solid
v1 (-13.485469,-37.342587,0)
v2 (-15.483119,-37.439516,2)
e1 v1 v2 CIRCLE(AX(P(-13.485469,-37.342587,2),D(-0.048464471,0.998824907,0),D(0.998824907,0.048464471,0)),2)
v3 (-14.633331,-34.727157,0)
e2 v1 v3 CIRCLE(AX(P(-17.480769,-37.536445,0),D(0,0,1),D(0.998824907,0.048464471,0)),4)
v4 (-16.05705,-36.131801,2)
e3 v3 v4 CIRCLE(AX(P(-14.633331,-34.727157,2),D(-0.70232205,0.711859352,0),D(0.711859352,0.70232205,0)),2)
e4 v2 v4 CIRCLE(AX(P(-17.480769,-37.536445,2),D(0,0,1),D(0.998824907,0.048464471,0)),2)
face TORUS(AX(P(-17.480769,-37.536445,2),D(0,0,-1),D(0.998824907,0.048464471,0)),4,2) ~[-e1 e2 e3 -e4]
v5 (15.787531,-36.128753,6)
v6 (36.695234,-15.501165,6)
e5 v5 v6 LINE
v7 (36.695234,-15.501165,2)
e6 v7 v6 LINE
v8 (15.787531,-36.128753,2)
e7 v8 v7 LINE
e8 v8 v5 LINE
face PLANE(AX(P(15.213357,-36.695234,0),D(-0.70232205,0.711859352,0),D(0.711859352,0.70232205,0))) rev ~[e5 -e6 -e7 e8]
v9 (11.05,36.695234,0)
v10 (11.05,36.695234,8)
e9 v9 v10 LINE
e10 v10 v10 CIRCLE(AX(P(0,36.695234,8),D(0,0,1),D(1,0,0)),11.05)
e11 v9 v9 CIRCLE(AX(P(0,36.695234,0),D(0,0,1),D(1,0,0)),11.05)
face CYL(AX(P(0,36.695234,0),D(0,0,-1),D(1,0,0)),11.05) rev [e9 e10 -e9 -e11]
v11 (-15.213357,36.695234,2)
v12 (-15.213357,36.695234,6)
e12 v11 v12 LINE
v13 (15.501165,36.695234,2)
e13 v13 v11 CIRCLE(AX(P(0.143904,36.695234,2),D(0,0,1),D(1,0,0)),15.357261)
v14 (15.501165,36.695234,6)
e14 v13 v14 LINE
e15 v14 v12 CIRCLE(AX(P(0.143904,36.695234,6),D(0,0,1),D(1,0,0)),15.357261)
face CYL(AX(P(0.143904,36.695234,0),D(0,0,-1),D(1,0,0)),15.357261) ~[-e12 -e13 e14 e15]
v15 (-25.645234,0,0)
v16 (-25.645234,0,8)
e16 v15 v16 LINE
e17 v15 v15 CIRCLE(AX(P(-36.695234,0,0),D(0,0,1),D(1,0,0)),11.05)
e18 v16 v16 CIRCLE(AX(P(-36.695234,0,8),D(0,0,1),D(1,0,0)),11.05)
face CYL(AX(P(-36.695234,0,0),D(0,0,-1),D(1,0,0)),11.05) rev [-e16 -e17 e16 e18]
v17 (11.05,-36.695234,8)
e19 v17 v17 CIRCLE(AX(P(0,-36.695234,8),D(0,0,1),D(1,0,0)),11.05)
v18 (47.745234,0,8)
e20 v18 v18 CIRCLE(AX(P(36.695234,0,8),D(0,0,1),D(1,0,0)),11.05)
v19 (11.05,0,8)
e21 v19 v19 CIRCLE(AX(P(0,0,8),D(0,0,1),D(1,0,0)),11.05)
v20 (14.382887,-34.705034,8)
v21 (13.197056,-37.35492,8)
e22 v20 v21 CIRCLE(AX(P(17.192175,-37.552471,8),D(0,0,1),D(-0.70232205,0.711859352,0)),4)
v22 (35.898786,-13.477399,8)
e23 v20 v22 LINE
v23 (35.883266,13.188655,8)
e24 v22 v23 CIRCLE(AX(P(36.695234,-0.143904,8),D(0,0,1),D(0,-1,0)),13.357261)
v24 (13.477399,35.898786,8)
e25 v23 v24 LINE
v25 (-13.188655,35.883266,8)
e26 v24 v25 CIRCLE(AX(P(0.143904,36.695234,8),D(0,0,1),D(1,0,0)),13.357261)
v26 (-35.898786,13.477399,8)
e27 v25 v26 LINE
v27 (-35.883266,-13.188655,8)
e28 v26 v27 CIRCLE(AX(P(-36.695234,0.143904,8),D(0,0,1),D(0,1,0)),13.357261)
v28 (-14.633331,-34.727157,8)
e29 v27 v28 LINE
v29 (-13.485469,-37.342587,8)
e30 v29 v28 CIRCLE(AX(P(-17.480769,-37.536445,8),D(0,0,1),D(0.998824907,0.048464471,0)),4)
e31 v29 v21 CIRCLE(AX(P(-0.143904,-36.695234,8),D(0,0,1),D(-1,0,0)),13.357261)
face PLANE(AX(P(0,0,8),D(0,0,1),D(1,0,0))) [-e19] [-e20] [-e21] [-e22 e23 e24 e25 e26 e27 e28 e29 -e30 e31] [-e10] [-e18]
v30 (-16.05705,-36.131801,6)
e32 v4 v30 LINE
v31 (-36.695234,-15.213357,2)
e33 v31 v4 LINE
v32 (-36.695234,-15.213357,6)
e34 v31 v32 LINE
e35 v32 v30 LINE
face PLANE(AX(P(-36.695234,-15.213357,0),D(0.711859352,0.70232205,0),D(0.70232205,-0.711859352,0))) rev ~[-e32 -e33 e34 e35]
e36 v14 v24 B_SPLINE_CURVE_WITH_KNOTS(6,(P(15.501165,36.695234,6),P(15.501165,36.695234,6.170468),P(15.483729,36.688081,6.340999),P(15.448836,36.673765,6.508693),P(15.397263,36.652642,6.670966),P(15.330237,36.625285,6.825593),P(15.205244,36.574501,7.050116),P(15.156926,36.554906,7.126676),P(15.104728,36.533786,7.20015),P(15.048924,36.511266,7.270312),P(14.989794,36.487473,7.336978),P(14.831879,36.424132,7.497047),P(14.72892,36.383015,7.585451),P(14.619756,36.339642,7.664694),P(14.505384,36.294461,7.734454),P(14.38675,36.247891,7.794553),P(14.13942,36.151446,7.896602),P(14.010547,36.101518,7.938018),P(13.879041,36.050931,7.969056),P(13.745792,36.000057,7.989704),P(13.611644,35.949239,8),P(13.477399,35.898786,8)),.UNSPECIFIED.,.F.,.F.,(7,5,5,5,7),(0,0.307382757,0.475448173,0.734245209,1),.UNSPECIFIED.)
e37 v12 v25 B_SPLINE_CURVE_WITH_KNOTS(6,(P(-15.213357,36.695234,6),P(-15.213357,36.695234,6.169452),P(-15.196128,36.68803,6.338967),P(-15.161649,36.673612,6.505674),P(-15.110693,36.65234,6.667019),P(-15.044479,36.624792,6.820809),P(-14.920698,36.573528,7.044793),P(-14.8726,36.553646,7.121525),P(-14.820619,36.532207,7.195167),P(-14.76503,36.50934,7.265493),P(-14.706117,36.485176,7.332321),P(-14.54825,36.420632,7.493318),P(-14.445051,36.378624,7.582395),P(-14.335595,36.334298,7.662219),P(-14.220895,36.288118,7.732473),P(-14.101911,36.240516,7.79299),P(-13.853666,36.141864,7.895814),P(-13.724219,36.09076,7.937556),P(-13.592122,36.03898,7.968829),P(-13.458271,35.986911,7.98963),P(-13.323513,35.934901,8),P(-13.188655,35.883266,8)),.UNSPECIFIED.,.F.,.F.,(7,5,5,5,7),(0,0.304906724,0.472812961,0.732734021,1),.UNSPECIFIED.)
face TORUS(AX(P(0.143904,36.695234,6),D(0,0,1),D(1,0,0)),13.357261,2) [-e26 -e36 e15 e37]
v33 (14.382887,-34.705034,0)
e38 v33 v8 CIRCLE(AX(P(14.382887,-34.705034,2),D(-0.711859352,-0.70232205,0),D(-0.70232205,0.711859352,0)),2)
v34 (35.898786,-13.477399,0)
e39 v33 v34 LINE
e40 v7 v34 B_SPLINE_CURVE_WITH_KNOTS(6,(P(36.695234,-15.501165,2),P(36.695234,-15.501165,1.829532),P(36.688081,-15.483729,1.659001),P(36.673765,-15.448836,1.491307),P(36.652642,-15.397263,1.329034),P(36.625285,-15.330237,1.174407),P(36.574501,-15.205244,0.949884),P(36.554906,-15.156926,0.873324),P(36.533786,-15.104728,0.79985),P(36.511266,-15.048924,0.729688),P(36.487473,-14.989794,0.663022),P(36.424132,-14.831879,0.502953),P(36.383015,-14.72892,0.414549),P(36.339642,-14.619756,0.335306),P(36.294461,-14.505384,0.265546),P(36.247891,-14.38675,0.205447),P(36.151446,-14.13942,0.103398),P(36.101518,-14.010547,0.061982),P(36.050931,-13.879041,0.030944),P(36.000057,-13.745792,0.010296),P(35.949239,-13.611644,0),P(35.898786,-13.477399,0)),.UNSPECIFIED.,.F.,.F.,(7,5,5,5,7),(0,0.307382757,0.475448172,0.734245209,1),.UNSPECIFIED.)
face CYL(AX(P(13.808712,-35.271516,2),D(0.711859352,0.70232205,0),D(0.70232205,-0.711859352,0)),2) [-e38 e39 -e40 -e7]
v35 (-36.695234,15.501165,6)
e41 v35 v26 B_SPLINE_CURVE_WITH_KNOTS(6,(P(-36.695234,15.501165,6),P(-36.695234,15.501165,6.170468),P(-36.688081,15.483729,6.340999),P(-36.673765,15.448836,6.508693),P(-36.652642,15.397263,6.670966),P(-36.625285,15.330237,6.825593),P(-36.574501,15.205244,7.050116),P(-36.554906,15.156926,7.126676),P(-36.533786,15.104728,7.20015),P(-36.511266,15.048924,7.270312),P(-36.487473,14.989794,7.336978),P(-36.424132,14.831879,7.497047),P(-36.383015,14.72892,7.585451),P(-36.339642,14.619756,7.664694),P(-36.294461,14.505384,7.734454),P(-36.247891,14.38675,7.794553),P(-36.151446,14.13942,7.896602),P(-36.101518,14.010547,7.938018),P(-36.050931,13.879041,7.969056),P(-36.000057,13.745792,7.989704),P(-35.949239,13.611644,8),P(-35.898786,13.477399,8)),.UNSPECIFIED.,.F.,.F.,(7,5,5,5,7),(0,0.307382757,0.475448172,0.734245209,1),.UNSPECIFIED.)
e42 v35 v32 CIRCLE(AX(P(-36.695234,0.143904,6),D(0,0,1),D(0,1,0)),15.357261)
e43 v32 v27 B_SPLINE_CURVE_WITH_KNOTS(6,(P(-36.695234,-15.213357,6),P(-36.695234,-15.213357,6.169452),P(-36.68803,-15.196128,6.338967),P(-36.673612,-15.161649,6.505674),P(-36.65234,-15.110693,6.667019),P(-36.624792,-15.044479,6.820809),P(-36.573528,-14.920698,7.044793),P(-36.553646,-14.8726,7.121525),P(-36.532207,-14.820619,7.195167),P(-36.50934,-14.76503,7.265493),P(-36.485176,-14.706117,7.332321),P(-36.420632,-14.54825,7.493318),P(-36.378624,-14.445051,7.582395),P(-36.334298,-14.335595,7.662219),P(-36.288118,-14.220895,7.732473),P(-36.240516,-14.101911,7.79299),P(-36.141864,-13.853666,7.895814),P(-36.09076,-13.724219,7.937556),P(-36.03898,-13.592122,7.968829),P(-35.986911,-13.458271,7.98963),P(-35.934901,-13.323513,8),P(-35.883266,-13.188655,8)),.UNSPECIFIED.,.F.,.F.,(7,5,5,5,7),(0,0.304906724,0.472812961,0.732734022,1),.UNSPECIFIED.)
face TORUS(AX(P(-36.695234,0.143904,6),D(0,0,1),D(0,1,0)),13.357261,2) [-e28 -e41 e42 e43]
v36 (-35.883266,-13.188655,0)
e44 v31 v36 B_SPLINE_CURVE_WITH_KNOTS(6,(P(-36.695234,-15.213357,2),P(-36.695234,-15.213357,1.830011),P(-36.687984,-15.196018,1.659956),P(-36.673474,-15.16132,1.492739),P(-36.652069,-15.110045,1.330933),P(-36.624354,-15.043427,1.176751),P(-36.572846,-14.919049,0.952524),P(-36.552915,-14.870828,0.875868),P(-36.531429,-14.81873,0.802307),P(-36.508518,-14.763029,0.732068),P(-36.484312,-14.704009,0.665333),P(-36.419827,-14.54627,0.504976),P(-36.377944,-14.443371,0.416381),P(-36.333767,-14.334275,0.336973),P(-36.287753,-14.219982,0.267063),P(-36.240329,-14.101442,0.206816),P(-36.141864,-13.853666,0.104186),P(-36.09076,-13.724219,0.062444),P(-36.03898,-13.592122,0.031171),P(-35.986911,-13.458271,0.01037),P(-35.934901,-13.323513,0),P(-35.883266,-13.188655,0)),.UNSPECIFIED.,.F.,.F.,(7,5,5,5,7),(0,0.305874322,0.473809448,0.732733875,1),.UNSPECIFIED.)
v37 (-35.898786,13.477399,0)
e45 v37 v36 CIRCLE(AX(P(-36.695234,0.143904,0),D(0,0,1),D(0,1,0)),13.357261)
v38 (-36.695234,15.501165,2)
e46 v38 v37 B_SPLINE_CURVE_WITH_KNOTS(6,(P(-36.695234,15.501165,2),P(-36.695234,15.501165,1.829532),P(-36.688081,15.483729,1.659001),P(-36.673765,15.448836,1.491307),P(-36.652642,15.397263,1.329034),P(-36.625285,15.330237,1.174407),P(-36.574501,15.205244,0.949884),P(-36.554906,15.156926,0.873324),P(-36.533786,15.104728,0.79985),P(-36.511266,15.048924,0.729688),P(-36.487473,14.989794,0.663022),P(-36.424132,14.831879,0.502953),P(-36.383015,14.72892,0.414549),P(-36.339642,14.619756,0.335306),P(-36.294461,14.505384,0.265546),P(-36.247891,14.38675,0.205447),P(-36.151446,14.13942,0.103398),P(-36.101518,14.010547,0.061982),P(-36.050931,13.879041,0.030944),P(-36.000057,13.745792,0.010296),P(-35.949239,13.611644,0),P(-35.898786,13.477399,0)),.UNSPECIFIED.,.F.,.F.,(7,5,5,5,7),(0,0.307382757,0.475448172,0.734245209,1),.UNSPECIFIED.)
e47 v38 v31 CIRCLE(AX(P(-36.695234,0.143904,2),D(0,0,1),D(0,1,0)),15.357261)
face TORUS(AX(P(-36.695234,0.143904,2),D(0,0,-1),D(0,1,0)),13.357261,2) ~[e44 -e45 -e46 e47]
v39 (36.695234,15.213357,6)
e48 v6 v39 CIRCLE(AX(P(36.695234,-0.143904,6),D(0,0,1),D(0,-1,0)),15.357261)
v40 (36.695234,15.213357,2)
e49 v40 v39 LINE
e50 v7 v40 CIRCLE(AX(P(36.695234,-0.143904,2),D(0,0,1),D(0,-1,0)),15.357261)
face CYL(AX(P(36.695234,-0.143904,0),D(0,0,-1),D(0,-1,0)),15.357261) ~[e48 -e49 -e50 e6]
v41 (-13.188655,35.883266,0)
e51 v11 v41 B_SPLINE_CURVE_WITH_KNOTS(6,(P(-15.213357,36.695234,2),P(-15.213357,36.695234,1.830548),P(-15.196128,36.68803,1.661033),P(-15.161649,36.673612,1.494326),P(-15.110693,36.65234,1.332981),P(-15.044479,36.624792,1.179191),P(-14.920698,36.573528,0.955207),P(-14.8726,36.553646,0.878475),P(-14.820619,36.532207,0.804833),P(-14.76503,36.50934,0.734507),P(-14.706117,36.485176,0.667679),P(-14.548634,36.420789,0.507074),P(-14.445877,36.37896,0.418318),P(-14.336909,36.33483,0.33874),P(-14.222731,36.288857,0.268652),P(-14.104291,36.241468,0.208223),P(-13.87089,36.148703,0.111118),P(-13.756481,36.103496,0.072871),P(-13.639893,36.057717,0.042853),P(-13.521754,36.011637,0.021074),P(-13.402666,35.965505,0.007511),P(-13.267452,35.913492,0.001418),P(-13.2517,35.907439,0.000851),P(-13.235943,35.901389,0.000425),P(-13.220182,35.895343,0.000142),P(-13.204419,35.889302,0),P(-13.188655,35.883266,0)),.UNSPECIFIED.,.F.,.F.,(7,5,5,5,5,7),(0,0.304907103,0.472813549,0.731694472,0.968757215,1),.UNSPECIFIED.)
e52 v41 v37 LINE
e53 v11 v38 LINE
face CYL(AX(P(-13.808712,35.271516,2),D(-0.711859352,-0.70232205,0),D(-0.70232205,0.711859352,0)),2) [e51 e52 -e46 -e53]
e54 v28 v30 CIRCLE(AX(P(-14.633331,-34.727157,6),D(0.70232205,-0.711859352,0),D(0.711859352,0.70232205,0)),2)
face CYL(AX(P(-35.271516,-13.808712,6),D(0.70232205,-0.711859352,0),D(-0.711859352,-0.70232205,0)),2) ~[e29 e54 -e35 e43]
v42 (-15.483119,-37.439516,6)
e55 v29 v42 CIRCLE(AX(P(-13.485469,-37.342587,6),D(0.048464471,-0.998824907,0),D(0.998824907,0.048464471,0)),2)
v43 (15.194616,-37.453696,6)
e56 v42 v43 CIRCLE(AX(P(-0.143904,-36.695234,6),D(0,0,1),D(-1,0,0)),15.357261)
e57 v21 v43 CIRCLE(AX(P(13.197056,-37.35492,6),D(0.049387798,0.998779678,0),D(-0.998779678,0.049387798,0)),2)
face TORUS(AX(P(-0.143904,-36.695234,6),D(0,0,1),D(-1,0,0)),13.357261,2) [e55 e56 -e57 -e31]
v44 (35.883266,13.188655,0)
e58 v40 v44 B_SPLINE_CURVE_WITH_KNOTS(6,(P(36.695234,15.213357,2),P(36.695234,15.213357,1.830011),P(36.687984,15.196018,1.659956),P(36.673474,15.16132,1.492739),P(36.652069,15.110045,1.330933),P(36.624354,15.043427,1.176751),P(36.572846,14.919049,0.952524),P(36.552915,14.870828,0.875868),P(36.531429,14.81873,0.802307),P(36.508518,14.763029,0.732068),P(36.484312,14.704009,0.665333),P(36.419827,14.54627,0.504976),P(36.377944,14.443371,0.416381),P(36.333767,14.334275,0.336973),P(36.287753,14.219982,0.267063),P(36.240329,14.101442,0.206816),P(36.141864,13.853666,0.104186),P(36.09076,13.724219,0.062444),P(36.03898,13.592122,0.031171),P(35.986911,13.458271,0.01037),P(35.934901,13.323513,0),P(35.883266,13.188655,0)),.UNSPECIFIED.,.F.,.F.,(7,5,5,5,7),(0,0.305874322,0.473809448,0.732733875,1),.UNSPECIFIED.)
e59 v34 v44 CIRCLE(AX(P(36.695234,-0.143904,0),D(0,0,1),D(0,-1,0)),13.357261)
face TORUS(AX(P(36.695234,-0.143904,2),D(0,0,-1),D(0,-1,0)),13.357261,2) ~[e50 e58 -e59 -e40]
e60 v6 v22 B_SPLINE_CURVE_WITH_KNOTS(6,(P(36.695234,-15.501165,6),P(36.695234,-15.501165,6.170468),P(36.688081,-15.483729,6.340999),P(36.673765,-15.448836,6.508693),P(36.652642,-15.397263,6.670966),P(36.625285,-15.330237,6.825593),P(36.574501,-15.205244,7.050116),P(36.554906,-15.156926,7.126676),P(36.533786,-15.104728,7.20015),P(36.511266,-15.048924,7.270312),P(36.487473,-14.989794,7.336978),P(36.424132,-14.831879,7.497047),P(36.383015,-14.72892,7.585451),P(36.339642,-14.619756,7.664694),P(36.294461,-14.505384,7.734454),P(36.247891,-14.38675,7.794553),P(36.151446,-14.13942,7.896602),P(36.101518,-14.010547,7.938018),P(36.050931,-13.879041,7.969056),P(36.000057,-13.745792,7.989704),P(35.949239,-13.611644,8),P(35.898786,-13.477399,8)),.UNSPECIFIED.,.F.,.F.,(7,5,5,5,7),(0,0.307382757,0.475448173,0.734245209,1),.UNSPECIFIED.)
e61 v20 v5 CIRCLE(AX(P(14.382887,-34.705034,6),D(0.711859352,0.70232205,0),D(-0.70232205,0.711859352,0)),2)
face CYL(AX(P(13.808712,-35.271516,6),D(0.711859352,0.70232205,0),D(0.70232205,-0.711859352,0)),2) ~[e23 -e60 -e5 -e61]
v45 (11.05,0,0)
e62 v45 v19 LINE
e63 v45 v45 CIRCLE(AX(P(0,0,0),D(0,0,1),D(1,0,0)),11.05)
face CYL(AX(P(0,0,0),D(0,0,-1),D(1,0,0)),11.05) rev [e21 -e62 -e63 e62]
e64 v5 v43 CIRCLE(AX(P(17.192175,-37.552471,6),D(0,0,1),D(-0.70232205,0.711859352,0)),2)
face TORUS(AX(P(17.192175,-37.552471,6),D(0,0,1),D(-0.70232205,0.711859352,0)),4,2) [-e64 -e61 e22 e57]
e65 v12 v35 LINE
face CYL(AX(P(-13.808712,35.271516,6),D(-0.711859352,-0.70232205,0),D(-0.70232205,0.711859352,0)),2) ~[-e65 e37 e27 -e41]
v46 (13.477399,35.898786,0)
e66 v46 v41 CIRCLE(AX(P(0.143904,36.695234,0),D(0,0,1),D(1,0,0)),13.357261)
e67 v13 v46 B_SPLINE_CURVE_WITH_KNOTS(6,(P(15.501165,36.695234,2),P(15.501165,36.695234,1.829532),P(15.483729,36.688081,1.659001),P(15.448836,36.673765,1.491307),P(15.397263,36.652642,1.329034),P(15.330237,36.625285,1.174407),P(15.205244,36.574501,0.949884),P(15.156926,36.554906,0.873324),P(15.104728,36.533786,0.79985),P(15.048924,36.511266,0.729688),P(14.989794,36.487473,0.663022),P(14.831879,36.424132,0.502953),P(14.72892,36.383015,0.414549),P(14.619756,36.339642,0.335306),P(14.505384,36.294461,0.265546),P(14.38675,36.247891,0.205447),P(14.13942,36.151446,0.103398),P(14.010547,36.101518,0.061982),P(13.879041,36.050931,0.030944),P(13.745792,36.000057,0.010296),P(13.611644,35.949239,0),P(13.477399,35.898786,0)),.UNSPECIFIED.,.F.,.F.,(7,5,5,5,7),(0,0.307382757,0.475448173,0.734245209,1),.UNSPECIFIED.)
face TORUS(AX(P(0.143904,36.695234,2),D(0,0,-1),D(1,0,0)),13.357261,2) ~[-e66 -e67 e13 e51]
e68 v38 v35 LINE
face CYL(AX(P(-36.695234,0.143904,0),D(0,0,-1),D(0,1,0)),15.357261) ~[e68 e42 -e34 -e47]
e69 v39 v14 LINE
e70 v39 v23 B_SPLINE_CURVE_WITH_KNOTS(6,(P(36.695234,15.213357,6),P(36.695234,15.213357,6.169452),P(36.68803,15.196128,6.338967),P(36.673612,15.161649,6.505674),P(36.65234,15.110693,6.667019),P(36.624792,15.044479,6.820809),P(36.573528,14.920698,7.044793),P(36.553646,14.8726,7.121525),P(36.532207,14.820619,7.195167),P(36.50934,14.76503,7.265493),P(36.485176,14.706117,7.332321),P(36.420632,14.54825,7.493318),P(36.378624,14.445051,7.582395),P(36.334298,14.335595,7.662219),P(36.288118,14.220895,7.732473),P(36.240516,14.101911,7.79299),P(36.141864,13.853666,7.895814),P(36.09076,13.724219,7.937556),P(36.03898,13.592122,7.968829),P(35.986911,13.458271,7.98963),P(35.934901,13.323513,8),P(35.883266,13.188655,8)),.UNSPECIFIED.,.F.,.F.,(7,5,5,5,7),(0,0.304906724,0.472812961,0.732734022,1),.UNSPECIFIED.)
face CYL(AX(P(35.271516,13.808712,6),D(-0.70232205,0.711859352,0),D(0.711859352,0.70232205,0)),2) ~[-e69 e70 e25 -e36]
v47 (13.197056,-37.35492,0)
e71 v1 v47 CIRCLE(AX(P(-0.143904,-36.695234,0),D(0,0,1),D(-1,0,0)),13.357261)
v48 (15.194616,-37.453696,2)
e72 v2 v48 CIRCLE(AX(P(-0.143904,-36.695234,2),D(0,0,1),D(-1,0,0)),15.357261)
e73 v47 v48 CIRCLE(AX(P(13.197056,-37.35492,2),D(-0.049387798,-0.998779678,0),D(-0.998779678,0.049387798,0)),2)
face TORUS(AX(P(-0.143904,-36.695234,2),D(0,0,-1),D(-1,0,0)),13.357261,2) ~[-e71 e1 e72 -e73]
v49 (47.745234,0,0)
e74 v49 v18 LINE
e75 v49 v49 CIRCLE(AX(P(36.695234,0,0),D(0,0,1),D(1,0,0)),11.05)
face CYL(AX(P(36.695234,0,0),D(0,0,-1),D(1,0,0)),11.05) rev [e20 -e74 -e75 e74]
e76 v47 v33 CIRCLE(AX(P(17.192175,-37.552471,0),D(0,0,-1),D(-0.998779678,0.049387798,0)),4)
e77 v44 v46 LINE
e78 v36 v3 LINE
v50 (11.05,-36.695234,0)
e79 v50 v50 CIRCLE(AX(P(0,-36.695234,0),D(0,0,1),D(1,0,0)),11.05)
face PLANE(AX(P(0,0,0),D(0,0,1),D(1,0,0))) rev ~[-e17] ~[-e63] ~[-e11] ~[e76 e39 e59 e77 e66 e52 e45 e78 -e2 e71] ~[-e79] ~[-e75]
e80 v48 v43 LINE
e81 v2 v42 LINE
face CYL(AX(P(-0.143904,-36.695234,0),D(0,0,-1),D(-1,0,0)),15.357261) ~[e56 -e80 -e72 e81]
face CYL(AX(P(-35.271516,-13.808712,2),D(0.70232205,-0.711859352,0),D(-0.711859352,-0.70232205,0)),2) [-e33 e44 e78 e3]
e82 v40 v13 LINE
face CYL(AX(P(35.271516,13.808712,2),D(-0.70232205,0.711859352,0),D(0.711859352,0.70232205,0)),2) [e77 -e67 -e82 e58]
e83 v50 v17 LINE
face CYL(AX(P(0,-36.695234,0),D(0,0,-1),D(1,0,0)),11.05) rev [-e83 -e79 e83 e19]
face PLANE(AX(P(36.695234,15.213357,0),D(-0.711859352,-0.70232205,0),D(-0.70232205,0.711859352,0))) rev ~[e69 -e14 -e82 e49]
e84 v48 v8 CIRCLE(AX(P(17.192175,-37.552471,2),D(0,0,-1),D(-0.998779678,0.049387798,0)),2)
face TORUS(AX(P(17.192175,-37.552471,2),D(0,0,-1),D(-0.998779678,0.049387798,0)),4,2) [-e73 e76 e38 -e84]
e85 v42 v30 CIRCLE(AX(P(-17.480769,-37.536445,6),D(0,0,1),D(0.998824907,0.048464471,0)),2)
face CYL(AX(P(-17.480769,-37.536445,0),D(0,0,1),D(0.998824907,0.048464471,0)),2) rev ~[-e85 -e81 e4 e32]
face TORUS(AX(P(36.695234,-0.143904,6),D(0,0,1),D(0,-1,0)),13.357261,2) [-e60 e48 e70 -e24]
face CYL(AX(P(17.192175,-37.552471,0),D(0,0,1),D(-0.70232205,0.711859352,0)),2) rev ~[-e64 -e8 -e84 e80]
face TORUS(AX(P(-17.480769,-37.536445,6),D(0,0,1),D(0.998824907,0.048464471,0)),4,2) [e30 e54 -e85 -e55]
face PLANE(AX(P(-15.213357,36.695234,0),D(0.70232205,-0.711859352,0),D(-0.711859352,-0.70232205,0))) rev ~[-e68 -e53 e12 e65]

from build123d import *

# Parameters (mm, degrees)
F0_R     = 11.05
F1_DEPTH = 8
F2_R     = 2


with BuildPart() as f1:
    # F0 (on Top) → F1 (new body)
    with BuildSketch(Plane.XY):
        with BuildLine():
            Line((36.6952344775, 15.2133565883), (15.5011650662, 36.6952344775))
            ThreePointArc((15.5011650662, 36.6952344775), (0.1439042389, 52.0524953048), (-15.2133565883, 36.6952344775))
            Line((-15.2133565883, 36.6952344775), (-36.6952344775, 15.5011650662))
            ThreePointArc((-36.6952344775, 15.5011650662), (-52.0524953048, 0.1439042389), (-36.6952344775, -15.2133565883))
            Line((-36.6952344775, -15.2133565883), (-15.5011650662, -36.6952344775))
            ThreePointArc((-15.5011650662, -36.6952344775), (-0.1439042389, -52.0524953048), (15.2133565883, -36.6952344775))
            Line((15.2133565883, -36.6952344775), (36.6952344775, -15.5011650662))
            ThreePointArc((36.6952344775, -15.5011650662), (52.0524953048, -0.1439042389), (36.6952344775, 15.2133565883))
        make_face()
        with Locations((0, -36.6952344775)):
            Circle(F0_R, mode=Mode.SUBTRACT)
        with Locations((-36.6952344775, 0)):
            Circle(F0_R, mode=Mode.SUBTRACT)
        Circle(F0_R, mode=Mode.SUBTRACT)
        with Locations((0, 36.6952344775)):
            Circle(F0_R, mode=Mode.SUBTRACT)
        with Locations((36.6952344775, 0)):
            Circle(F0_R, mode=Mode.SUBTRACT)
    extrude(amount=F1_DEPTH)

    # F2
    f2_edges = [f1.edges().sort_by_distance(p)[0] for p in [
        (-25.954296, 26.0982, 8),
        (0.143904, 52.052495, 8),
        (26.0982, 25.954296, 8),
        (52.052495, -0.143904, 8),
        (25.954296, -26.0982, 8),
        (-0.143904, -52.052495, 8),
        (-26.0982, -25.954296, 8),
        (-52.052495, 0.143904, 8),
        (-15.501165, -36.695234, 4),
        (15.213357, -36.695234, 4),
        (-0.143904, -52.052495, 0),
        (25.954296, -26.0982, 0),
        (52.052495, -0.143904, 0),
        (26.0982, 25.954296, 0),
        (0.143904, 52.052495, 0),
        (-25.954296, 26.0982, 0),
        (-52.052495, 0.143904, 0),
        (-26.0982, -25.954296, 0),
    ]]
    fillet(f2_edges, radius=F2_R)


solid = f1.part
